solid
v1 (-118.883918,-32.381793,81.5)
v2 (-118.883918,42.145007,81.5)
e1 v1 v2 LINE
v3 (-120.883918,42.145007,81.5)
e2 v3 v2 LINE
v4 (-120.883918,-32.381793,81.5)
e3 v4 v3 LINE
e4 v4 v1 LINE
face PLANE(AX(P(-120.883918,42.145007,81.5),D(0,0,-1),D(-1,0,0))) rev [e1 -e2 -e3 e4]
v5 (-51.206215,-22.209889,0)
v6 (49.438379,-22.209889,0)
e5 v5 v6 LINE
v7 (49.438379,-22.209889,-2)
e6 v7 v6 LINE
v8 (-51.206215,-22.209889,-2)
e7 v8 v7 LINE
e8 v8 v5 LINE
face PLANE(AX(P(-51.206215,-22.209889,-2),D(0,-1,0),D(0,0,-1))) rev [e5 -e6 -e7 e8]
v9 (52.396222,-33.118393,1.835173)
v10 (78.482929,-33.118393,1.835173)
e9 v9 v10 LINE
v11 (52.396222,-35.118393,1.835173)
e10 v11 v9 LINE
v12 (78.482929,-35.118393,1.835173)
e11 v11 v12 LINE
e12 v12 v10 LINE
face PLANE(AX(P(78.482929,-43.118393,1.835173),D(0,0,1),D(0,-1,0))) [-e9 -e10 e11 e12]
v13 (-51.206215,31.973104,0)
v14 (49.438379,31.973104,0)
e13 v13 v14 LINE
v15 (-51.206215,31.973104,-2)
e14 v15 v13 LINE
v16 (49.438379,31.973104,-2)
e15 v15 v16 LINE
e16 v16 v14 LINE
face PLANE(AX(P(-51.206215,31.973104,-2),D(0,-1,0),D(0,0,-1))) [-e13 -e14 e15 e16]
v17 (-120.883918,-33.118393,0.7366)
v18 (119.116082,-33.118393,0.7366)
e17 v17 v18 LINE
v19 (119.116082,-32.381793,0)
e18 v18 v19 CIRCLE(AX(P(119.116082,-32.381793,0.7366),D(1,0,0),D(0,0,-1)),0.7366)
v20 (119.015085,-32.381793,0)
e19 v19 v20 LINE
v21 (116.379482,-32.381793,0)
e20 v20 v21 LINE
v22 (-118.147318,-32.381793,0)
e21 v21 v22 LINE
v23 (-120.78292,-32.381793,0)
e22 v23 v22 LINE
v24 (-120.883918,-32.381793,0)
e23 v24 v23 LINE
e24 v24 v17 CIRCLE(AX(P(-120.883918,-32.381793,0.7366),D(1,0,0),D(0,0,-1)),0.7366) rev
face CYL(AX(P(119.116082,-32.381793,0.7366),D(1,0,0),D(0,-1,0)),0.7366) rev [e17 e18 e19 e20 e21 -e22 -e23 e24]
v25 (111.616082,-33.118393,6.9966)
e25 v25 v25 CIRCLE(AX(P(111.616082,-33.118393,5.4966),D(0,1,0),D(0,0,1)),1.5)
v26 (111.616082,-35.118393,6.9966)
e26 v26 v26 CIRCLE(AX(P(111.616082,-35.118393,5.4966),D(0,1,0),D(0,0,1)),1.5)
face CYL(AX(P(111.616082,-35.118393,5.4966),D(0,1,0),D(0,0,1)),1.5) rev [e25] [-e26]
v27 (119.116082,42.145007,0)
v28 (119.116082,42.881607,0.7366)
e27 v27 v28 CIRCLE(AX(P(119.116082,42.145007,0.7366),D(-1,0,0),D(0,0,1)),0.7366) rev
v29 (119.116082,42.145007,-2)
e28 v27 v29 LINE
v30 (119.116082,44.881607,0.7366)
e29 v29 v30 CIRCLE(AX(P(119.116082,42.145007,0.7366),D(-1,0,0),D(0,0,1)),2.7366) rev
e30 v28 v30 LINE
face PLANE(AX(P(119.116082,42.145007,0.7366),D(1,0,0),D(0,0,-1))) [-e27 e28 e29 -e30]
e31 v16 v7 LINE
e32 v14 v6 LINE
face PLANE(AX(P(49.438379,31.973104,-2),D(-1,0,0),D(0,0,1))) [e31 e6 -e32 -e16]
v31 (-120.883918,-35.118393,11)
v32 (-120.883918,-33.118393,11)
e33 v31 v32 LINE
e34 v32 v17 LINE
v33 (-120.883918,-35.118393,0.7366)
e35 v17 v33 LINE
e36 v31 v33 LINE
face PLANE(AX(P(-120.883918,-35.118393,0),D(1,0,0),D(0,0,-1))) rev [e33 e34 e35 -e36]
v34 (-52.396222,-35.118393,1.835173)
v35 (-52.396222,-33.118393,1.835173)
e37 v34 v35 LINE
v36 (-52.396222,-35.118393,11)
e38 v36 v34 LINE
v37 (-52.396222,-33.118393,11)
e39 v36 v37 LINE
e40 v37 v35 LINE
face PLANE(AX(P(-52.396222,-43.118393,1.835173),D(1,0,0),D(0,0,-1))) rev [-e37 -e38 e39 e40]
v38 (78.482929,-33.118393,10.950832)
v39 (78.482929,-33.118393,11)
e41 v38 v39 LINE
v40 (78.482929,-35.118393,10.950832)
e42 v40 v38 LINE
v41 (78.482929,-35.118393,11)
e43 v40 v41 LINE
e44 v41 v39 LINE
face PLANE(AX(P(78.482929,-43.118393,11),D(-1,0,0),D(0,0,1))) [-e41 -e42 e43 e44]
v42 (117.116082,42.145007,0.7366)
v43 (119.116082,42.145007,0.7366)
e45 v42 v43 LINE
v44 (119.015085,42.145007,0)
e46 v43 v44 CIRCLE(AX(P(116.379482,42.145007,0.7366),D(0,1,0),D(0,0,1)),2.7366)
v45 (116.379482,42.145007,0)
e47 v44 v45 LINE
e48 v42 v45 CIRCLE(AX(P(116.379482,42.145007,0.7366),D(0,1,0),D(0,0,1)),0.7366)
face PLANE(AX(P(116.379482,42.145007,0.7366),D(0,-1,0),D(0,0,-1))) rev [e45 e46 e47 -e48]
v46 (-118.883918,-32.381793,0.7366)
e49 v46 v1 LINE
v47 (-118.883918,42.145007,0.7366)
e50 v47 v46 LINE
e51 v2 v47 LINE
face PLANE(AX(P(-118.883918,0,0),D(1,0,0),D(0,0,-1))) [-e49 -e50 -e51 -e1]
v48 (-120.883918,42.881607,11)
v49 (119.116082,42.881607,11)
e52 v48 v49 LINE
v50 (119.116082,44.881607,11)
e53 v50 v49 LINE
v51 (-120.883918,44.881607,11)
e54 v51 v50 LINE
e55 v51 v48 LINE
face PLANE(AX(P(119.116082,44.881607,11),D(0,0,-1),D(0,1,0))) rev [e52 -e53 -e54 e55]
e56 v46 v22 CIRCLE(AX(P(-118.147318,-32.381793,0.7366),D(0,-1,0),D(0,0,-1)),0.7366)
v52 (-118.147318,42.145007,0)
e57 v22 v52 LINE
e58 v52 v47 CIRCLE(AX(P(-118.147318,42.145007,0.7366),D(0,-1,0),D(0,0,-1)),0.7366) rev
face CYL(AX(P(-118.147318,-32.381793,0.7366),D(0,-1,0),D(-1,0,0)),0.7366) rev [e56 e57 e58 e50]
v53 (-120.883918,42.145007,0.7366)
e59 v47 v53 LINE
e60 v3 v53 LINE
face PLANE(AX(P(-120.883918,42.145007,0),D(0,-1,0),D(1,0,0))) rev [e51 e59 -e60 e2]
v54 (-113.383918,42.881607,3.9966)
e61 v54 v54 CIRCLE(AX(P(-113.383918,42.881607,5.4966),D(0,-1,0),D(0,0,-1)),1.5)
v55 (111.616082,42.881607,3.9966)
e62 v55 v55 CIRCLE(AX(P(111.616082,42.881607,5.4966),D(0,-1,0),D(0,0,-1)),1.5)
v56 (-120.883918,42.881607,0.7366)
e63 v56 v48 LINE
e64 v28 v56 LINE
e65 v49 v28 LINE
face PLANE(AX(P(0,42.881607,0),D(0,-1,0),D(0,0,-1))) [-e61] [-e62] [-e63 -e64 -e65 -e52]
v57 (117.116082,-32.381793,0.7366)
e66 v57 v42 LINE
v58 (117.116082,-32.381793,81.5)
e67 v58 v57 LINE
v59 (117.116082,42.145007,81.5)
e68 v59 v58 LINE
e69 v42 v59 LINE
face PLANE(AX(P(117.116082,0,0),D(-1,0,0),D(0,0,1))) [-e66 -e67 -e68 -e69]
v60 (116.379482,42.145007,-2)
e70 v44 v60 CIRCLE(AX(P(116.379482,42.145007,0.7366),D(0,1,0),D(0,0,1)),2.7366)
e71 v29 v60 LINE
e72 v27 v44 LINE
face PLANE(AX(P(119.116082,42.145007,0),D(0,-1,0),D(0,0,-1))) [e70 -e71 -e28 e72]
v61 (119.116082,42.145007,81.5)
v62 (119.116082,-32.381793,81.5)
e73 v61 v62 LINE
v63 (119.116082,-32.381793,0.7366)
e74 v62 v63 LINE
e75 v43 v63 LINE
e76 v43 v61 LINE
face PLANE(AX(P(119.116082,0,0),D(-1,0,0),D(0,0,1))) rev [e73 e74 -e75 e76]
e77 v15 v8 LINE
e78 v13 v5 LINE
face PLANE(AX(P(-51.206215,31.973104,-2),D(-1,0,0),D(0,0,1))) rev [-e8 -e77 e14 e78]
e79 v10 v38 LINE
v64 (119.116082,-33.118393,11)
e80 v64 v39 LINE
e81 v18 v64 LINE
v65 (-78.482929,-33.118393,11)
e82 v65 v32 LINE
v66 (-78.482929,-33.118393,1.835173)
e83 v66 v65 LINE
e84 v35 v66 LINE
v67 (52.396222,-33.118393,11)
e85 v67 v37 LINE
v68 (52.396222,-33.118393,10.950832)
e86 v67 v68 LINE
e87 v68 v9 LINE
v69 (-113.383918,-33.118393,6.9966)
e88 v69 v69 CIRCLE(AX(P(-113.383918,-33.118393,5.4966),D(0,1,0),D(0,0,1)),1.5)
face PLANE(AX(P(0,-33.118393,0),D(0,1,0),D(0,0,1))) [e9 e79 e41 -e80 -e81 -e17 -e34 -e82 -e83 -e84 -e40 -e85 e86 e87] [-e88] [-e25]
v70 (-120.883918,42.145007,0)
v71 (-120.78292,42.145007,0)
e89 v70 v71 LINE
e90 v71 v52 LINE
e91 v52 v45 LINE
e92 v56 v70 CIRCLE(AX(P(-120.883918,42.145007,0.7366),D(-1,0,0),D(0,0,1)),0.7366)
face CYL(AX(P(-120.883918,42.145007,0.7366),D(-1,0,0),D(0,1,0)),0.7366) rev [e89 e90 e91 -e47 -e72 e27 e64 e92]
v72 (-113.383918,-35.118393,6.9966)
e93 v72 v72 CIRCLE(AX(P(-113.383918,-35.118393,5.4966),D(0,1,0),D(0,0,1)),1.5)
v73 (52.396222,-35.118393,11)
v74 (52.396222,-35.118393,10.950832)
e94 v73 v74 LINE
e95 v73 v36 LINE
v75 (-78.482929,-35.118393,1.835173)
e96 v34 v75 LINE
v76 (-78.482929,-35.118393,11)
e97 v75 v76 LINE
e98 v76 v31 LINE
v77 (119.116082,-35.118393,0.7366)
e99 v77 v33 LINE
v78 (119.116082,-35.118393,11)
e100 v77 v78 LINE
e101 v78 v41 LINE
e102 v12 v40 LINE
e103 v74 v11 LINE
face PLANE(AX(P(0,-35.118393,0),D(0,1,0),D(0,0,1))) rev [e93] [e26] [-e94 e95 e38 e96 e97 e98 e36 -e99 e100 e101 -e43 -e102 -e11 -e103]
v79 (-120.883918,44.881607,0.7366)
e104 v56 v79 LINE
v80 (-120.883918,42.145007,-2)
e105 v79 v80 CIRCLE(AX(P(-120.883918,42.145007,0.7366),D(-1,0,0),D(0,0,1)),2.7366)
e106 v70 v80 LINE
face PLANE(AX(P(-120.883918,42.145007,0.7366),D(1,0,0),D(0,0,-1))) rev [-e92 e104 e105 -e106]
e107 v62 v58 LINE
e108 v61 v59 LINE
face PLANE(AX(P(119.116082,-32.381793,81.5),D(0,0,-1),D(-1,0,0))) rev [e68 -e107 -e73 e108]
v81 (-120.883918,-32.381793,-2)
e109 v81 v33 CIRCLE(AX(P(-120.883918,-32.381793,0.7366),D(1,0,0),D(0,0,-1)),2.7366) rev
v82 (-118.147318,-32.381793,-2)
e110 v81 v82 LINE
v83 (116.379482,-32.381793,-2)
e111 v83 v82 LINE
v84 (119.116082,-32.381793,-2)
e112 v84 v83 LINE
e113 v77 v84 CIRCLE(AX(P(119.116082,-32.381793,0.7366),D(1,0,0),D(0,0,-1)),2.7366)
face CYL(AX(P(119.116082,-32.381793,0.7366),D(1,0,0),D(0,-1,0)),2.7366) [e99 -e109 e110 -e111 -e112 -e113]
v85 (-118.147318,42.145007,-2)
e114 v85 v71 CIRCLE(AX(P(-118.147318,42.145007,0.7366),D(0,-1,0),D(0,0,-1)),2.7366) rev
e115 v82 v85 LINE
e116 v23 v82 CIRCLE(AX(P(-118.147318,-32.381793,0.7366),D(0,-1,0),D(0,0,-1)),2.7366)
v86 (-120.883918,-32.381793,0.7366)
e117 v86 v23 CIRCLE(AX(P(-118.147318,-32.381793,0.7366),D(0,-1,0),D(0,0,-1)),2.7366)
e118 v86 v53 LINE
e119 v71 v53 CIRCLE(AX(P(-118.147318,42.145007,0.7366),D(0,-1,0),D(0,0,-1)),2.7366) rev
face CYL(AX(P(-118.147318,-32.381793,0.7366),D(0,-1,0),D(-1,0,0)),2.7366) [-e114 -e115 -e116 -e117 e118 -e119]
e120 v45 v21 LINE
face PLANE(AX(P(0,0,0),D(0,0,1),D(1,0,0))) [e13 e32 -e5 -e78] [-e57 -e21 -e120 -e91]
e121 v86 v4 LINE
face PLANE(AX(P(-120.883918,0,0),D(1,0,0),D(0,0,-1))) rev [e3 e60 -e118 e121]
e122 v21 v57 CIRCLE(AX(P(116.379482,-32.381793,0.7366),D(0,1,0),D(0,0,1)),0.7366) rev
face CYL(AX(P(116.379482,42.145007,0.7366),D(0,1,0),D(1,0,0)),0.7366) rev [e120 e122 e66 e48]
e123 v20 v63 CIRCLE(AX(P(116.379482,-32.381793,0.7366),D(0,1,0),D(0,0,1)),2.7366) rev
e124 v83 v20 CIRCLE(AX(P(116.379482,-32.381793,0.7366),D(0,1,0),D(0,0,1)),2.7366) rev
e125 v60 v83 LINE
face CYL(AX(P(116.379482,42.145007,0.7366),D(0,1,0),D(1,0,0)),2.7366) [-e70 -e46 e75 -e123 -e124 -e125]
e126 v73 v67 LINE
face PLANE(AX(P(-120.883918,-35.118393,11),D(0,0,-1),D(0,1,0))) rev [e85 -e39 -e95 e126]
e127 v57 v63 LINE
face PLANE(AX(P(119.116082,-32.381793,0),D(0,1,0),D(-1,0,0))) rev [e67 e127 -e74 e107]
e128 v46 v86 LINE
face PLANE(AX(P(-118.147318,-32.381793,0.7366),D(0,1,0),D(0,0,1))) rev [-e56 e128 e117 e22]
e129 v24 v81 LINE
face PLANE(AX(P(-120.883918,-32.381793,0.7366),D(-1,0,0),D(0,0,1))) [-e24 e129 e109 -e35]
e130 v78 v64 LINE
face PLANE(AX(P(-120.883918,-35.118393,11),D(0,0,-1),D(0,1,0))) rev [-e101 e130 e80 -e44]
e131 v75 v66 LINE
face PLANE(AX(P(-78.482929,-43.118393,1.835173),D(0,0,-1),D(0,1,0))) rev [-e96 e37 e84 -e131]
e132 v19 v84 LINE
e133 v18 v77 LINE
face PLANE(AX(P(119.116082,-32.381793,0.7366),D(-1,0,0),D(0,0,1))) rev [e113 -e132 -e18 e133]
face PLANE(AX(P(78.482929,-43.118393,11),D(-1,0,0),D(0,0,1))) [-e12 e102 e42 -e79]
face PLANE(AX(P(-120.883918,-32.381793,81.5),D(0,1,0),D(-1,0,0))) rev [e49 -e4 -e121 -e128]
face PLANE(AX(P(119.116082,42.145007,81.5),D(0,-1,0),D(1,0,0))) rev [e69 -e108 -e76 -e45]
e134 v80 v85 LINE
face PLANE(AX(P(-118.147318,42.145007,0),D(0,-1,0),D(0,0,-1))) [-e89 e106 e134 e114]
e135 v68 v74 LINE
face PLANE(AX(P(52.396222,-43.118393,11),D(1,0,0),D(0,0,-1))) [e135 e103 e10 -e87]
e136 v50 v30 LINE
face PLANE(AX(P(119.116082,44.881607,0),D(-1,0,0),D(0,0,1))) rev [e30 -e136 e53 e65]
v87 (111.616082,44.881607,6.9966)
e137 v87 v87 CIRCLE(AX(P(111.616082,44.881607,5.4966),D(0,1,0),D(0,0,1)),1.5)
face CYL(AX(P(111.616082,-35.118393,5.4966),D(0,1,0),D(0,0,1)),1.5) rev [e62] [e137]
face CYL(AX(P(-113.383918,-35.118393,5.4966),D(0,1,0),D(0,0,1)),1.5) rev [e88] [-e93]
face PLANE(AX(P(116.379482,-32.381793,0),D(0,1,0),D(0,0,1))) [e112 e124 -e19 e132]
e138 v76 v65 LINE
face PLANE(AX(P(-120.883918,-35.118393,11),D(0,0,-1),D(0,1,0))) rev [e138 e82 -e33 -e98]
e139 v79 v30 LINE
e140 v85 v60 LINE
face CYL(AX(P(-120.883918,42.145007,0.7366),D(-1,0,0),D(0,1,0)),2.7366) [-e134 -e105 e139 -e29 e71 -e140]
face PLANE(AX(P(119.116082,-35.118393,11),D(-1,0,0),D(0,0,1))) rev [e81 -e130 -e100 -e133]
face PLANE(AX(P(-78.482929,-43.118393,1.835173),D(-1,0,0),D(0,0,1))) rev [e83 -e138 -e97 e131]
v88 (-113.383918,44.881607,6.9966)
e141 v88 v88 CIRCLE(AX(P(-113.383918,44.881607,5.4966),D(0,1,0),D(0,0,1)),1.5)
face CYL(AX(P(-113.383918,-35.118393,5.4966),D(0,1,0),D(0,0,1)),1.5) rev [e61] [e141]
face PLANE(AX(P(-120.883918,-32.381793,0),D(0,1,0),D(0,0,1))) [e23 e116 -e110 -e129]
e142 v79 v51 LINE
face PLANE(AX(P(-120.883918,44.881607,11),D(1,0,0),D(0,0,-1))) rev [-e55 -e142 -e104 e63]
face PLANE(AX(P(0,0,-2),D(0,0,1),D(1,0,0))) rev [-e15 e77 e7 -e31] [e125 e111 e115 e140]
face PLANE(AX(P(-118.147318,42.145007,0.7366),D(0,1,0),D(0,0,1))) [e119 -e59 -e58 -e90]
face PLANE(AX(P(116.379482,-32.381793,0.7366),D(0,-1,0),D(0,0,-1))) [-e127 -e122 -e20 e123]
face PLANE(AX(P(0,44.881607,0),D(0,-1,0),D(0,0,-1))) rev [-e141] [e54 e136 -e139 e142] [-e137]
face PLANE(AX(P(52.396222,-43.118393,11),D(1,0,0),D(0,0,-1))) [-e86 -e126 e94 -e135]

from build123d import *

# Parameters (mm, degrees)
SKETCH31_W                     = 240
SKETCH31_H                     = 80
BASE_FLANGE1_DEPTH             = 2
EDGE_FLANGE1_STRIP_W           = 9.4732
EDGE_FLANGE1_STRIP_H           = 2
EDGE_FLANGE1_STRIP_CUT_DEPTH   = 240
EDGE_FLANGE1_STRIP_2_W         = 9.4732
EDGE_FLANGE1_STRIP_2_H         = 2
EDGE_FLANGE1_STRIP_CUT_2_DEPTH = 240
EDGE_FLANGE1_DEPTH             = 240
EDGE_FLANGE1_BEND_DEPTH        = 240
EDGE_FLANGE2_STRIP_W           = 9.4732
EDGE_FLANGE2_STRIP_H           = 2
EDGE_FLANGE2_STRIP_CUT_DEPTH   = 74.5268
EDGE_FLANGE2_STRIP_2_W         = 9.4732
EDGE_FLANGE2_STRIP_2_H         = 2
EDGE_FLANGE2_STRIP_CUT_2_DEPTH = 74.5268
EDGE_FLANGE2_DEPTH             = 74.5268
EDGE_FLANGE2_BEND_DEPTH        = 74.5268
SKETCH52_W                     = 26.086706926
SKETCH52_H                     = 9.115658902
CUT_EXTRUDE2_DEPTH             = 10
SKETCH53_W                     = 26.086706926
SKETCH53_H                     = 0.049167759
CUT_EXTRUDE3_DEPTH             = 10
SKETCH61_R                     = 1.5
CUT_EXTRUDE8_DEPTH             = 167.29844137
SKETCH62_R                     = 1.5
CUT_EXTRUDE9_DEPTH             = 167.29844137
SKETCH65_W                     = 100.644593538
SKETCH65_H                     = 54.18299384
CUT_EXTRUDE11_DEPTH            = 153.543535722


# Sheet-metal steps are written as plain solids
with BuildPart() as part:
    # Base-Flange1: sheet metal written as solids
    # Sketch31 → Base-Flange1 (new body)
    with BuildSketch(Plane.XY):
        with Locations((-0.883917881, 4.881607463)):
            Rectangle(SKETCH31_W, SKETCH31_H)
    extrude(amount=-BASE_FLANGE1_DEPTH)

    # Edge-Flange1: sheet metal written as solids
    # Edge-Flange1 strip (on a plane across the edge) → Edge-Flange1 strip cut (cut)
    with BuildSketch(Plane(origin=(119.116082119, 44.881607463, 0), x_dir=(0, -1, 0), z_dir=(-1, 0, 0))):
        with Locations((-2, -1)):
            Rectangle(EDGE_FLANGE1_STRIP_W, EDGE_FLANGE1_STRIP_H)
    extrude(amount=EDGE_FLANGE1_STRIP_CUT_DEPTH, mode=Mode.SUBTRACT)

    # Edge-Flange1 strip 2 (on a plane across the edge) → Edge-Flange1 strip cut 2 (cut)
    with BuildSketch(Plane(origin=(-120.883917881, -35.118392537, 0), x_dir=(0, 1, 0), z_dir=(1, 0, 0))):
        with Locations((-2, -1)):
            Rectangle(EDGE_FLANGE1_STRIP_2_W, EDGE_FLANGE1_STRIP_2_H)
    extrude(amount=EDGE_FLANGE1_STRIP_CUT_2_DEPTH, mode=Mode.SUBTRACT)

    # Edge-Flange1 section (on a plane across the edge) → Edge-Flange1 (add)
    with BuildSketch(Plane(origin=(119.116082119, 44.881607463, 0), x_dir=(0, -1, 0), z_dir=(-1, 0, 0))):
        with BuildLine():
            Line((0, 0.7366), (0, 11))
            Line((0, 11), (2, 11))
            Line((2, 11), (2, 0.7366))
            ThreePointArc((2, 0.7366), (2.215745145, 0.215745145), (2.7366, 0))
            Line((2.7366, 0), (2.7366, -2))
            ThreePointArc((2.7366, -2), (0.801531583, -1.198468417), (0, 0.7366))
        make_face()
    extrude(amount=EDGE_FLANGE1_DEPTH)

    # Edge-Flange1 section 2 (on a plane across the edge) → Edge-Flange1 bend (add)
    with BuildSketch(Plane(origin=(-120.883917881, -35.118392537, 0), x_dir=(0, 1, 0), z_dir=(1, 0, 0))):
        with BuildLine():
            Line((0, 0.7366), (0, 11))
            Line((0, 11), (2, 11))
            Line((2, 11), (2, 0.7366))
            ThreePointArc((2, 0.7366), (2.215745145, 0.215745145), (2.7366, 0))
            Line((2.7366, 0), (2.7366, -2))
            ThreePointArc((2.7366, -2), (0.801531583, -1.198468417), (0, 0.7366))
        make_face()
    extrude(amount=EDGE_FLANGE1_BEND_DEPTH)

    # Edge-Flange2: sheet metal written as solids
    # Edge-Flange2 strip (on a plane across the edge) → Edge-Flange2 strip cut (cut)
    with BuildSketch(Plane(origin=(-120.883917881, 42.145007463, 0), x_dir=(1, 0, 0), z_dir=(0, -1, 0))):
        with Locations((-2, -1)):
            Rectangle(EDGE_FLANGE2_STRIP_W, EDGE_FLANGE2_STRIP_H)
    extrude(amount=EDGE_FLANGE2_STRIP_CUT_DEPTH, mode=Mode.SUBTRACT)

    # Edge-Flange2 strip 2 (on a plane across the edge) → Edge-Flange2 strip cut 2 (cut)
    with BuildSketch(Plane(origin=(119.116082119, -32.381792537, 0), x_dir=(-1, 0, 0), z_dir=(0, 1, 0))):
        with Locations((-2, -1)):
            Rectangle(EDGE_FLANGE2_STRIP_2_W, EDGE_FLANGE2_STRIP_2_H)
    extrude(amount=EDGE_FLANGE2_STRIP_CUT_2_DEPTH, mode=Mode.SUBTRACT)

    # Edge-Flange2 section (on a plane across the edge) → Edge-Flange2 (add)
    with BuildSketch(Plane(origin=(-120.883917881, 42.145007463, 0), x_dir=(1, 0, 0), z_dir=(0, -1, 0))):
        with BuildLine():
            Line((0, 0.7366), (0, 81.5))
            Line((0, 81.5), (2, 81.5))
            Line((2, 81.5), (2, 0.7366))
            ThreePointArc((2, 0.7366), (2.215745145, 0.215745145), (2.7366, 0))
            Line((2.7366, 0), (2.7366, -2))
            ThreePointArc((2.7366, -2), (0.801531583, -1.198468417), (0, 0.7366))
        make_face()
    extrude(amount=EDGE_FLANGE2_DEPTH)

    # Edge-Flange2 section 2 (on a plane across the edge) → Edge-Flange2 bend (add)
    with BuildSketch(Plane(origin=(119.116082119, -32.381792537, 0), x_dir=(-1, 0, 0), z_dir=(0, 1, 0))):
        with BuildLine():
            Line((0, 0.7366), (0, 81.5))
            Line((0, 81.5), (2, 81.5))
            Line((2, 81.5), (2, 0.7366))
            ThreePointArc((2, 0.7366), (2.215745145, 0.215745145), (2.7366, 0))
            Line((2.7366, 0), (2.7366, -2))
            ThreePointArc((2.7366, -2), (0.801531583, -1.198468417), (0, 0.7366))
        make_face()
    extrude(amount=EDGE_FLANGE2_BEND_DEPTH)

    # Sketch52 → Cut-Extrude2 (cut)
    with BuildSketch(Plane(origin=(0, -33.118392537, 0), x_dir=(1, 0, 0), z_dir=(0, 1, 0))):
        with Locations((-65.439575559, -6.39300279)):
            Rectangle(SKETCH52_W, SKETCH52_H)
    cut_extrude2 = extrude(amount=-CUT_EXTRUDE2_DEPTH, mode=Mode.SUBTRACT)

    # Sketch53 → Cut-Extrude3 (cut)
    with BuildSketch(Plane(origin=(0, -33.118392537, 0), x_dir=(1, 0, 0), z_dir=(0, 1, 0))):
        with Locations((-65.439575559, -10.975416121)):
            Rectangle(SKETCH53_W, SKETCH53_H)
    cut_extrude3 = extrude(amount=-CUT_EXTRUDE3_DEPTH, mode=Mode.SUBTRACT)

    # Mirror3: Cut-Extrude3 across plane
    add(cut_extrude3.mirror(Plane(origin=(0, 0, 0), x_dir=(0, 0, 1), z_dir=(1, 0, 0))), mode=Mode.SUBTRACT)

    # Mirror4: Cut-Extrude2, Cut-Extrude3 across plane
    add(cut_extrude2.mirror(Plane(origin=(0, 0, 0), x_dir=(0, 0, 1), z_dir=(1, 0, 0))), mode=Mode.SUBTRACT)
    add(cut_extrude3.mirror(Plane(origin=(0, 0, 0), x_dir=(0, 0, 1), z_dir=(1, 0, 0))), mode=Mode.SUBTRACT)

    # Sketch61 → Cut-Extrude8 (cut, through all)
    with BuildSketch(Plane(origin=(0, 44.881607463, 0), x_dir=(1, 0, 0), z_dir=(0, 1, 0))):
        with Locations(Location((111.616082119, -5.4966, 0), (0, 0, 270))):
            Circle(SKETCH61_R)
    extrude(amount=-CUT_EXTRUDE8_DEPTH, mode=Mode.SUBTRACT)

    # Sketch62 → Cut-Extrude9 (cut, through all)
    with BuildSketch(Plane(origin=(0, 44.881607463, 0), x_dir=(1, 0, 0), z_dir=(0, 1, 0))):
        with Locations(Location((-113.383917881, -5.4966, 0), (0, 0, 270))):
            Circle(SKETCH62_R)
    extrude(amount=-CUT_EXTRUDE9_DEPTH, mode=Mode.SUBTRACT)

    # Sketch65 → Cut-Extrude11 (cut, through all)
    with BuildSketch(Plane.XY):
        with Locations((-0.883917881, 4.881607463)):
            Rectangle(SKETCH65_W, SKETCH65_H)
    extrude(amount=-CUT_EXTRUDE11_DEPTH, mode=Mode.SUBTRACT)


solid = part.part
